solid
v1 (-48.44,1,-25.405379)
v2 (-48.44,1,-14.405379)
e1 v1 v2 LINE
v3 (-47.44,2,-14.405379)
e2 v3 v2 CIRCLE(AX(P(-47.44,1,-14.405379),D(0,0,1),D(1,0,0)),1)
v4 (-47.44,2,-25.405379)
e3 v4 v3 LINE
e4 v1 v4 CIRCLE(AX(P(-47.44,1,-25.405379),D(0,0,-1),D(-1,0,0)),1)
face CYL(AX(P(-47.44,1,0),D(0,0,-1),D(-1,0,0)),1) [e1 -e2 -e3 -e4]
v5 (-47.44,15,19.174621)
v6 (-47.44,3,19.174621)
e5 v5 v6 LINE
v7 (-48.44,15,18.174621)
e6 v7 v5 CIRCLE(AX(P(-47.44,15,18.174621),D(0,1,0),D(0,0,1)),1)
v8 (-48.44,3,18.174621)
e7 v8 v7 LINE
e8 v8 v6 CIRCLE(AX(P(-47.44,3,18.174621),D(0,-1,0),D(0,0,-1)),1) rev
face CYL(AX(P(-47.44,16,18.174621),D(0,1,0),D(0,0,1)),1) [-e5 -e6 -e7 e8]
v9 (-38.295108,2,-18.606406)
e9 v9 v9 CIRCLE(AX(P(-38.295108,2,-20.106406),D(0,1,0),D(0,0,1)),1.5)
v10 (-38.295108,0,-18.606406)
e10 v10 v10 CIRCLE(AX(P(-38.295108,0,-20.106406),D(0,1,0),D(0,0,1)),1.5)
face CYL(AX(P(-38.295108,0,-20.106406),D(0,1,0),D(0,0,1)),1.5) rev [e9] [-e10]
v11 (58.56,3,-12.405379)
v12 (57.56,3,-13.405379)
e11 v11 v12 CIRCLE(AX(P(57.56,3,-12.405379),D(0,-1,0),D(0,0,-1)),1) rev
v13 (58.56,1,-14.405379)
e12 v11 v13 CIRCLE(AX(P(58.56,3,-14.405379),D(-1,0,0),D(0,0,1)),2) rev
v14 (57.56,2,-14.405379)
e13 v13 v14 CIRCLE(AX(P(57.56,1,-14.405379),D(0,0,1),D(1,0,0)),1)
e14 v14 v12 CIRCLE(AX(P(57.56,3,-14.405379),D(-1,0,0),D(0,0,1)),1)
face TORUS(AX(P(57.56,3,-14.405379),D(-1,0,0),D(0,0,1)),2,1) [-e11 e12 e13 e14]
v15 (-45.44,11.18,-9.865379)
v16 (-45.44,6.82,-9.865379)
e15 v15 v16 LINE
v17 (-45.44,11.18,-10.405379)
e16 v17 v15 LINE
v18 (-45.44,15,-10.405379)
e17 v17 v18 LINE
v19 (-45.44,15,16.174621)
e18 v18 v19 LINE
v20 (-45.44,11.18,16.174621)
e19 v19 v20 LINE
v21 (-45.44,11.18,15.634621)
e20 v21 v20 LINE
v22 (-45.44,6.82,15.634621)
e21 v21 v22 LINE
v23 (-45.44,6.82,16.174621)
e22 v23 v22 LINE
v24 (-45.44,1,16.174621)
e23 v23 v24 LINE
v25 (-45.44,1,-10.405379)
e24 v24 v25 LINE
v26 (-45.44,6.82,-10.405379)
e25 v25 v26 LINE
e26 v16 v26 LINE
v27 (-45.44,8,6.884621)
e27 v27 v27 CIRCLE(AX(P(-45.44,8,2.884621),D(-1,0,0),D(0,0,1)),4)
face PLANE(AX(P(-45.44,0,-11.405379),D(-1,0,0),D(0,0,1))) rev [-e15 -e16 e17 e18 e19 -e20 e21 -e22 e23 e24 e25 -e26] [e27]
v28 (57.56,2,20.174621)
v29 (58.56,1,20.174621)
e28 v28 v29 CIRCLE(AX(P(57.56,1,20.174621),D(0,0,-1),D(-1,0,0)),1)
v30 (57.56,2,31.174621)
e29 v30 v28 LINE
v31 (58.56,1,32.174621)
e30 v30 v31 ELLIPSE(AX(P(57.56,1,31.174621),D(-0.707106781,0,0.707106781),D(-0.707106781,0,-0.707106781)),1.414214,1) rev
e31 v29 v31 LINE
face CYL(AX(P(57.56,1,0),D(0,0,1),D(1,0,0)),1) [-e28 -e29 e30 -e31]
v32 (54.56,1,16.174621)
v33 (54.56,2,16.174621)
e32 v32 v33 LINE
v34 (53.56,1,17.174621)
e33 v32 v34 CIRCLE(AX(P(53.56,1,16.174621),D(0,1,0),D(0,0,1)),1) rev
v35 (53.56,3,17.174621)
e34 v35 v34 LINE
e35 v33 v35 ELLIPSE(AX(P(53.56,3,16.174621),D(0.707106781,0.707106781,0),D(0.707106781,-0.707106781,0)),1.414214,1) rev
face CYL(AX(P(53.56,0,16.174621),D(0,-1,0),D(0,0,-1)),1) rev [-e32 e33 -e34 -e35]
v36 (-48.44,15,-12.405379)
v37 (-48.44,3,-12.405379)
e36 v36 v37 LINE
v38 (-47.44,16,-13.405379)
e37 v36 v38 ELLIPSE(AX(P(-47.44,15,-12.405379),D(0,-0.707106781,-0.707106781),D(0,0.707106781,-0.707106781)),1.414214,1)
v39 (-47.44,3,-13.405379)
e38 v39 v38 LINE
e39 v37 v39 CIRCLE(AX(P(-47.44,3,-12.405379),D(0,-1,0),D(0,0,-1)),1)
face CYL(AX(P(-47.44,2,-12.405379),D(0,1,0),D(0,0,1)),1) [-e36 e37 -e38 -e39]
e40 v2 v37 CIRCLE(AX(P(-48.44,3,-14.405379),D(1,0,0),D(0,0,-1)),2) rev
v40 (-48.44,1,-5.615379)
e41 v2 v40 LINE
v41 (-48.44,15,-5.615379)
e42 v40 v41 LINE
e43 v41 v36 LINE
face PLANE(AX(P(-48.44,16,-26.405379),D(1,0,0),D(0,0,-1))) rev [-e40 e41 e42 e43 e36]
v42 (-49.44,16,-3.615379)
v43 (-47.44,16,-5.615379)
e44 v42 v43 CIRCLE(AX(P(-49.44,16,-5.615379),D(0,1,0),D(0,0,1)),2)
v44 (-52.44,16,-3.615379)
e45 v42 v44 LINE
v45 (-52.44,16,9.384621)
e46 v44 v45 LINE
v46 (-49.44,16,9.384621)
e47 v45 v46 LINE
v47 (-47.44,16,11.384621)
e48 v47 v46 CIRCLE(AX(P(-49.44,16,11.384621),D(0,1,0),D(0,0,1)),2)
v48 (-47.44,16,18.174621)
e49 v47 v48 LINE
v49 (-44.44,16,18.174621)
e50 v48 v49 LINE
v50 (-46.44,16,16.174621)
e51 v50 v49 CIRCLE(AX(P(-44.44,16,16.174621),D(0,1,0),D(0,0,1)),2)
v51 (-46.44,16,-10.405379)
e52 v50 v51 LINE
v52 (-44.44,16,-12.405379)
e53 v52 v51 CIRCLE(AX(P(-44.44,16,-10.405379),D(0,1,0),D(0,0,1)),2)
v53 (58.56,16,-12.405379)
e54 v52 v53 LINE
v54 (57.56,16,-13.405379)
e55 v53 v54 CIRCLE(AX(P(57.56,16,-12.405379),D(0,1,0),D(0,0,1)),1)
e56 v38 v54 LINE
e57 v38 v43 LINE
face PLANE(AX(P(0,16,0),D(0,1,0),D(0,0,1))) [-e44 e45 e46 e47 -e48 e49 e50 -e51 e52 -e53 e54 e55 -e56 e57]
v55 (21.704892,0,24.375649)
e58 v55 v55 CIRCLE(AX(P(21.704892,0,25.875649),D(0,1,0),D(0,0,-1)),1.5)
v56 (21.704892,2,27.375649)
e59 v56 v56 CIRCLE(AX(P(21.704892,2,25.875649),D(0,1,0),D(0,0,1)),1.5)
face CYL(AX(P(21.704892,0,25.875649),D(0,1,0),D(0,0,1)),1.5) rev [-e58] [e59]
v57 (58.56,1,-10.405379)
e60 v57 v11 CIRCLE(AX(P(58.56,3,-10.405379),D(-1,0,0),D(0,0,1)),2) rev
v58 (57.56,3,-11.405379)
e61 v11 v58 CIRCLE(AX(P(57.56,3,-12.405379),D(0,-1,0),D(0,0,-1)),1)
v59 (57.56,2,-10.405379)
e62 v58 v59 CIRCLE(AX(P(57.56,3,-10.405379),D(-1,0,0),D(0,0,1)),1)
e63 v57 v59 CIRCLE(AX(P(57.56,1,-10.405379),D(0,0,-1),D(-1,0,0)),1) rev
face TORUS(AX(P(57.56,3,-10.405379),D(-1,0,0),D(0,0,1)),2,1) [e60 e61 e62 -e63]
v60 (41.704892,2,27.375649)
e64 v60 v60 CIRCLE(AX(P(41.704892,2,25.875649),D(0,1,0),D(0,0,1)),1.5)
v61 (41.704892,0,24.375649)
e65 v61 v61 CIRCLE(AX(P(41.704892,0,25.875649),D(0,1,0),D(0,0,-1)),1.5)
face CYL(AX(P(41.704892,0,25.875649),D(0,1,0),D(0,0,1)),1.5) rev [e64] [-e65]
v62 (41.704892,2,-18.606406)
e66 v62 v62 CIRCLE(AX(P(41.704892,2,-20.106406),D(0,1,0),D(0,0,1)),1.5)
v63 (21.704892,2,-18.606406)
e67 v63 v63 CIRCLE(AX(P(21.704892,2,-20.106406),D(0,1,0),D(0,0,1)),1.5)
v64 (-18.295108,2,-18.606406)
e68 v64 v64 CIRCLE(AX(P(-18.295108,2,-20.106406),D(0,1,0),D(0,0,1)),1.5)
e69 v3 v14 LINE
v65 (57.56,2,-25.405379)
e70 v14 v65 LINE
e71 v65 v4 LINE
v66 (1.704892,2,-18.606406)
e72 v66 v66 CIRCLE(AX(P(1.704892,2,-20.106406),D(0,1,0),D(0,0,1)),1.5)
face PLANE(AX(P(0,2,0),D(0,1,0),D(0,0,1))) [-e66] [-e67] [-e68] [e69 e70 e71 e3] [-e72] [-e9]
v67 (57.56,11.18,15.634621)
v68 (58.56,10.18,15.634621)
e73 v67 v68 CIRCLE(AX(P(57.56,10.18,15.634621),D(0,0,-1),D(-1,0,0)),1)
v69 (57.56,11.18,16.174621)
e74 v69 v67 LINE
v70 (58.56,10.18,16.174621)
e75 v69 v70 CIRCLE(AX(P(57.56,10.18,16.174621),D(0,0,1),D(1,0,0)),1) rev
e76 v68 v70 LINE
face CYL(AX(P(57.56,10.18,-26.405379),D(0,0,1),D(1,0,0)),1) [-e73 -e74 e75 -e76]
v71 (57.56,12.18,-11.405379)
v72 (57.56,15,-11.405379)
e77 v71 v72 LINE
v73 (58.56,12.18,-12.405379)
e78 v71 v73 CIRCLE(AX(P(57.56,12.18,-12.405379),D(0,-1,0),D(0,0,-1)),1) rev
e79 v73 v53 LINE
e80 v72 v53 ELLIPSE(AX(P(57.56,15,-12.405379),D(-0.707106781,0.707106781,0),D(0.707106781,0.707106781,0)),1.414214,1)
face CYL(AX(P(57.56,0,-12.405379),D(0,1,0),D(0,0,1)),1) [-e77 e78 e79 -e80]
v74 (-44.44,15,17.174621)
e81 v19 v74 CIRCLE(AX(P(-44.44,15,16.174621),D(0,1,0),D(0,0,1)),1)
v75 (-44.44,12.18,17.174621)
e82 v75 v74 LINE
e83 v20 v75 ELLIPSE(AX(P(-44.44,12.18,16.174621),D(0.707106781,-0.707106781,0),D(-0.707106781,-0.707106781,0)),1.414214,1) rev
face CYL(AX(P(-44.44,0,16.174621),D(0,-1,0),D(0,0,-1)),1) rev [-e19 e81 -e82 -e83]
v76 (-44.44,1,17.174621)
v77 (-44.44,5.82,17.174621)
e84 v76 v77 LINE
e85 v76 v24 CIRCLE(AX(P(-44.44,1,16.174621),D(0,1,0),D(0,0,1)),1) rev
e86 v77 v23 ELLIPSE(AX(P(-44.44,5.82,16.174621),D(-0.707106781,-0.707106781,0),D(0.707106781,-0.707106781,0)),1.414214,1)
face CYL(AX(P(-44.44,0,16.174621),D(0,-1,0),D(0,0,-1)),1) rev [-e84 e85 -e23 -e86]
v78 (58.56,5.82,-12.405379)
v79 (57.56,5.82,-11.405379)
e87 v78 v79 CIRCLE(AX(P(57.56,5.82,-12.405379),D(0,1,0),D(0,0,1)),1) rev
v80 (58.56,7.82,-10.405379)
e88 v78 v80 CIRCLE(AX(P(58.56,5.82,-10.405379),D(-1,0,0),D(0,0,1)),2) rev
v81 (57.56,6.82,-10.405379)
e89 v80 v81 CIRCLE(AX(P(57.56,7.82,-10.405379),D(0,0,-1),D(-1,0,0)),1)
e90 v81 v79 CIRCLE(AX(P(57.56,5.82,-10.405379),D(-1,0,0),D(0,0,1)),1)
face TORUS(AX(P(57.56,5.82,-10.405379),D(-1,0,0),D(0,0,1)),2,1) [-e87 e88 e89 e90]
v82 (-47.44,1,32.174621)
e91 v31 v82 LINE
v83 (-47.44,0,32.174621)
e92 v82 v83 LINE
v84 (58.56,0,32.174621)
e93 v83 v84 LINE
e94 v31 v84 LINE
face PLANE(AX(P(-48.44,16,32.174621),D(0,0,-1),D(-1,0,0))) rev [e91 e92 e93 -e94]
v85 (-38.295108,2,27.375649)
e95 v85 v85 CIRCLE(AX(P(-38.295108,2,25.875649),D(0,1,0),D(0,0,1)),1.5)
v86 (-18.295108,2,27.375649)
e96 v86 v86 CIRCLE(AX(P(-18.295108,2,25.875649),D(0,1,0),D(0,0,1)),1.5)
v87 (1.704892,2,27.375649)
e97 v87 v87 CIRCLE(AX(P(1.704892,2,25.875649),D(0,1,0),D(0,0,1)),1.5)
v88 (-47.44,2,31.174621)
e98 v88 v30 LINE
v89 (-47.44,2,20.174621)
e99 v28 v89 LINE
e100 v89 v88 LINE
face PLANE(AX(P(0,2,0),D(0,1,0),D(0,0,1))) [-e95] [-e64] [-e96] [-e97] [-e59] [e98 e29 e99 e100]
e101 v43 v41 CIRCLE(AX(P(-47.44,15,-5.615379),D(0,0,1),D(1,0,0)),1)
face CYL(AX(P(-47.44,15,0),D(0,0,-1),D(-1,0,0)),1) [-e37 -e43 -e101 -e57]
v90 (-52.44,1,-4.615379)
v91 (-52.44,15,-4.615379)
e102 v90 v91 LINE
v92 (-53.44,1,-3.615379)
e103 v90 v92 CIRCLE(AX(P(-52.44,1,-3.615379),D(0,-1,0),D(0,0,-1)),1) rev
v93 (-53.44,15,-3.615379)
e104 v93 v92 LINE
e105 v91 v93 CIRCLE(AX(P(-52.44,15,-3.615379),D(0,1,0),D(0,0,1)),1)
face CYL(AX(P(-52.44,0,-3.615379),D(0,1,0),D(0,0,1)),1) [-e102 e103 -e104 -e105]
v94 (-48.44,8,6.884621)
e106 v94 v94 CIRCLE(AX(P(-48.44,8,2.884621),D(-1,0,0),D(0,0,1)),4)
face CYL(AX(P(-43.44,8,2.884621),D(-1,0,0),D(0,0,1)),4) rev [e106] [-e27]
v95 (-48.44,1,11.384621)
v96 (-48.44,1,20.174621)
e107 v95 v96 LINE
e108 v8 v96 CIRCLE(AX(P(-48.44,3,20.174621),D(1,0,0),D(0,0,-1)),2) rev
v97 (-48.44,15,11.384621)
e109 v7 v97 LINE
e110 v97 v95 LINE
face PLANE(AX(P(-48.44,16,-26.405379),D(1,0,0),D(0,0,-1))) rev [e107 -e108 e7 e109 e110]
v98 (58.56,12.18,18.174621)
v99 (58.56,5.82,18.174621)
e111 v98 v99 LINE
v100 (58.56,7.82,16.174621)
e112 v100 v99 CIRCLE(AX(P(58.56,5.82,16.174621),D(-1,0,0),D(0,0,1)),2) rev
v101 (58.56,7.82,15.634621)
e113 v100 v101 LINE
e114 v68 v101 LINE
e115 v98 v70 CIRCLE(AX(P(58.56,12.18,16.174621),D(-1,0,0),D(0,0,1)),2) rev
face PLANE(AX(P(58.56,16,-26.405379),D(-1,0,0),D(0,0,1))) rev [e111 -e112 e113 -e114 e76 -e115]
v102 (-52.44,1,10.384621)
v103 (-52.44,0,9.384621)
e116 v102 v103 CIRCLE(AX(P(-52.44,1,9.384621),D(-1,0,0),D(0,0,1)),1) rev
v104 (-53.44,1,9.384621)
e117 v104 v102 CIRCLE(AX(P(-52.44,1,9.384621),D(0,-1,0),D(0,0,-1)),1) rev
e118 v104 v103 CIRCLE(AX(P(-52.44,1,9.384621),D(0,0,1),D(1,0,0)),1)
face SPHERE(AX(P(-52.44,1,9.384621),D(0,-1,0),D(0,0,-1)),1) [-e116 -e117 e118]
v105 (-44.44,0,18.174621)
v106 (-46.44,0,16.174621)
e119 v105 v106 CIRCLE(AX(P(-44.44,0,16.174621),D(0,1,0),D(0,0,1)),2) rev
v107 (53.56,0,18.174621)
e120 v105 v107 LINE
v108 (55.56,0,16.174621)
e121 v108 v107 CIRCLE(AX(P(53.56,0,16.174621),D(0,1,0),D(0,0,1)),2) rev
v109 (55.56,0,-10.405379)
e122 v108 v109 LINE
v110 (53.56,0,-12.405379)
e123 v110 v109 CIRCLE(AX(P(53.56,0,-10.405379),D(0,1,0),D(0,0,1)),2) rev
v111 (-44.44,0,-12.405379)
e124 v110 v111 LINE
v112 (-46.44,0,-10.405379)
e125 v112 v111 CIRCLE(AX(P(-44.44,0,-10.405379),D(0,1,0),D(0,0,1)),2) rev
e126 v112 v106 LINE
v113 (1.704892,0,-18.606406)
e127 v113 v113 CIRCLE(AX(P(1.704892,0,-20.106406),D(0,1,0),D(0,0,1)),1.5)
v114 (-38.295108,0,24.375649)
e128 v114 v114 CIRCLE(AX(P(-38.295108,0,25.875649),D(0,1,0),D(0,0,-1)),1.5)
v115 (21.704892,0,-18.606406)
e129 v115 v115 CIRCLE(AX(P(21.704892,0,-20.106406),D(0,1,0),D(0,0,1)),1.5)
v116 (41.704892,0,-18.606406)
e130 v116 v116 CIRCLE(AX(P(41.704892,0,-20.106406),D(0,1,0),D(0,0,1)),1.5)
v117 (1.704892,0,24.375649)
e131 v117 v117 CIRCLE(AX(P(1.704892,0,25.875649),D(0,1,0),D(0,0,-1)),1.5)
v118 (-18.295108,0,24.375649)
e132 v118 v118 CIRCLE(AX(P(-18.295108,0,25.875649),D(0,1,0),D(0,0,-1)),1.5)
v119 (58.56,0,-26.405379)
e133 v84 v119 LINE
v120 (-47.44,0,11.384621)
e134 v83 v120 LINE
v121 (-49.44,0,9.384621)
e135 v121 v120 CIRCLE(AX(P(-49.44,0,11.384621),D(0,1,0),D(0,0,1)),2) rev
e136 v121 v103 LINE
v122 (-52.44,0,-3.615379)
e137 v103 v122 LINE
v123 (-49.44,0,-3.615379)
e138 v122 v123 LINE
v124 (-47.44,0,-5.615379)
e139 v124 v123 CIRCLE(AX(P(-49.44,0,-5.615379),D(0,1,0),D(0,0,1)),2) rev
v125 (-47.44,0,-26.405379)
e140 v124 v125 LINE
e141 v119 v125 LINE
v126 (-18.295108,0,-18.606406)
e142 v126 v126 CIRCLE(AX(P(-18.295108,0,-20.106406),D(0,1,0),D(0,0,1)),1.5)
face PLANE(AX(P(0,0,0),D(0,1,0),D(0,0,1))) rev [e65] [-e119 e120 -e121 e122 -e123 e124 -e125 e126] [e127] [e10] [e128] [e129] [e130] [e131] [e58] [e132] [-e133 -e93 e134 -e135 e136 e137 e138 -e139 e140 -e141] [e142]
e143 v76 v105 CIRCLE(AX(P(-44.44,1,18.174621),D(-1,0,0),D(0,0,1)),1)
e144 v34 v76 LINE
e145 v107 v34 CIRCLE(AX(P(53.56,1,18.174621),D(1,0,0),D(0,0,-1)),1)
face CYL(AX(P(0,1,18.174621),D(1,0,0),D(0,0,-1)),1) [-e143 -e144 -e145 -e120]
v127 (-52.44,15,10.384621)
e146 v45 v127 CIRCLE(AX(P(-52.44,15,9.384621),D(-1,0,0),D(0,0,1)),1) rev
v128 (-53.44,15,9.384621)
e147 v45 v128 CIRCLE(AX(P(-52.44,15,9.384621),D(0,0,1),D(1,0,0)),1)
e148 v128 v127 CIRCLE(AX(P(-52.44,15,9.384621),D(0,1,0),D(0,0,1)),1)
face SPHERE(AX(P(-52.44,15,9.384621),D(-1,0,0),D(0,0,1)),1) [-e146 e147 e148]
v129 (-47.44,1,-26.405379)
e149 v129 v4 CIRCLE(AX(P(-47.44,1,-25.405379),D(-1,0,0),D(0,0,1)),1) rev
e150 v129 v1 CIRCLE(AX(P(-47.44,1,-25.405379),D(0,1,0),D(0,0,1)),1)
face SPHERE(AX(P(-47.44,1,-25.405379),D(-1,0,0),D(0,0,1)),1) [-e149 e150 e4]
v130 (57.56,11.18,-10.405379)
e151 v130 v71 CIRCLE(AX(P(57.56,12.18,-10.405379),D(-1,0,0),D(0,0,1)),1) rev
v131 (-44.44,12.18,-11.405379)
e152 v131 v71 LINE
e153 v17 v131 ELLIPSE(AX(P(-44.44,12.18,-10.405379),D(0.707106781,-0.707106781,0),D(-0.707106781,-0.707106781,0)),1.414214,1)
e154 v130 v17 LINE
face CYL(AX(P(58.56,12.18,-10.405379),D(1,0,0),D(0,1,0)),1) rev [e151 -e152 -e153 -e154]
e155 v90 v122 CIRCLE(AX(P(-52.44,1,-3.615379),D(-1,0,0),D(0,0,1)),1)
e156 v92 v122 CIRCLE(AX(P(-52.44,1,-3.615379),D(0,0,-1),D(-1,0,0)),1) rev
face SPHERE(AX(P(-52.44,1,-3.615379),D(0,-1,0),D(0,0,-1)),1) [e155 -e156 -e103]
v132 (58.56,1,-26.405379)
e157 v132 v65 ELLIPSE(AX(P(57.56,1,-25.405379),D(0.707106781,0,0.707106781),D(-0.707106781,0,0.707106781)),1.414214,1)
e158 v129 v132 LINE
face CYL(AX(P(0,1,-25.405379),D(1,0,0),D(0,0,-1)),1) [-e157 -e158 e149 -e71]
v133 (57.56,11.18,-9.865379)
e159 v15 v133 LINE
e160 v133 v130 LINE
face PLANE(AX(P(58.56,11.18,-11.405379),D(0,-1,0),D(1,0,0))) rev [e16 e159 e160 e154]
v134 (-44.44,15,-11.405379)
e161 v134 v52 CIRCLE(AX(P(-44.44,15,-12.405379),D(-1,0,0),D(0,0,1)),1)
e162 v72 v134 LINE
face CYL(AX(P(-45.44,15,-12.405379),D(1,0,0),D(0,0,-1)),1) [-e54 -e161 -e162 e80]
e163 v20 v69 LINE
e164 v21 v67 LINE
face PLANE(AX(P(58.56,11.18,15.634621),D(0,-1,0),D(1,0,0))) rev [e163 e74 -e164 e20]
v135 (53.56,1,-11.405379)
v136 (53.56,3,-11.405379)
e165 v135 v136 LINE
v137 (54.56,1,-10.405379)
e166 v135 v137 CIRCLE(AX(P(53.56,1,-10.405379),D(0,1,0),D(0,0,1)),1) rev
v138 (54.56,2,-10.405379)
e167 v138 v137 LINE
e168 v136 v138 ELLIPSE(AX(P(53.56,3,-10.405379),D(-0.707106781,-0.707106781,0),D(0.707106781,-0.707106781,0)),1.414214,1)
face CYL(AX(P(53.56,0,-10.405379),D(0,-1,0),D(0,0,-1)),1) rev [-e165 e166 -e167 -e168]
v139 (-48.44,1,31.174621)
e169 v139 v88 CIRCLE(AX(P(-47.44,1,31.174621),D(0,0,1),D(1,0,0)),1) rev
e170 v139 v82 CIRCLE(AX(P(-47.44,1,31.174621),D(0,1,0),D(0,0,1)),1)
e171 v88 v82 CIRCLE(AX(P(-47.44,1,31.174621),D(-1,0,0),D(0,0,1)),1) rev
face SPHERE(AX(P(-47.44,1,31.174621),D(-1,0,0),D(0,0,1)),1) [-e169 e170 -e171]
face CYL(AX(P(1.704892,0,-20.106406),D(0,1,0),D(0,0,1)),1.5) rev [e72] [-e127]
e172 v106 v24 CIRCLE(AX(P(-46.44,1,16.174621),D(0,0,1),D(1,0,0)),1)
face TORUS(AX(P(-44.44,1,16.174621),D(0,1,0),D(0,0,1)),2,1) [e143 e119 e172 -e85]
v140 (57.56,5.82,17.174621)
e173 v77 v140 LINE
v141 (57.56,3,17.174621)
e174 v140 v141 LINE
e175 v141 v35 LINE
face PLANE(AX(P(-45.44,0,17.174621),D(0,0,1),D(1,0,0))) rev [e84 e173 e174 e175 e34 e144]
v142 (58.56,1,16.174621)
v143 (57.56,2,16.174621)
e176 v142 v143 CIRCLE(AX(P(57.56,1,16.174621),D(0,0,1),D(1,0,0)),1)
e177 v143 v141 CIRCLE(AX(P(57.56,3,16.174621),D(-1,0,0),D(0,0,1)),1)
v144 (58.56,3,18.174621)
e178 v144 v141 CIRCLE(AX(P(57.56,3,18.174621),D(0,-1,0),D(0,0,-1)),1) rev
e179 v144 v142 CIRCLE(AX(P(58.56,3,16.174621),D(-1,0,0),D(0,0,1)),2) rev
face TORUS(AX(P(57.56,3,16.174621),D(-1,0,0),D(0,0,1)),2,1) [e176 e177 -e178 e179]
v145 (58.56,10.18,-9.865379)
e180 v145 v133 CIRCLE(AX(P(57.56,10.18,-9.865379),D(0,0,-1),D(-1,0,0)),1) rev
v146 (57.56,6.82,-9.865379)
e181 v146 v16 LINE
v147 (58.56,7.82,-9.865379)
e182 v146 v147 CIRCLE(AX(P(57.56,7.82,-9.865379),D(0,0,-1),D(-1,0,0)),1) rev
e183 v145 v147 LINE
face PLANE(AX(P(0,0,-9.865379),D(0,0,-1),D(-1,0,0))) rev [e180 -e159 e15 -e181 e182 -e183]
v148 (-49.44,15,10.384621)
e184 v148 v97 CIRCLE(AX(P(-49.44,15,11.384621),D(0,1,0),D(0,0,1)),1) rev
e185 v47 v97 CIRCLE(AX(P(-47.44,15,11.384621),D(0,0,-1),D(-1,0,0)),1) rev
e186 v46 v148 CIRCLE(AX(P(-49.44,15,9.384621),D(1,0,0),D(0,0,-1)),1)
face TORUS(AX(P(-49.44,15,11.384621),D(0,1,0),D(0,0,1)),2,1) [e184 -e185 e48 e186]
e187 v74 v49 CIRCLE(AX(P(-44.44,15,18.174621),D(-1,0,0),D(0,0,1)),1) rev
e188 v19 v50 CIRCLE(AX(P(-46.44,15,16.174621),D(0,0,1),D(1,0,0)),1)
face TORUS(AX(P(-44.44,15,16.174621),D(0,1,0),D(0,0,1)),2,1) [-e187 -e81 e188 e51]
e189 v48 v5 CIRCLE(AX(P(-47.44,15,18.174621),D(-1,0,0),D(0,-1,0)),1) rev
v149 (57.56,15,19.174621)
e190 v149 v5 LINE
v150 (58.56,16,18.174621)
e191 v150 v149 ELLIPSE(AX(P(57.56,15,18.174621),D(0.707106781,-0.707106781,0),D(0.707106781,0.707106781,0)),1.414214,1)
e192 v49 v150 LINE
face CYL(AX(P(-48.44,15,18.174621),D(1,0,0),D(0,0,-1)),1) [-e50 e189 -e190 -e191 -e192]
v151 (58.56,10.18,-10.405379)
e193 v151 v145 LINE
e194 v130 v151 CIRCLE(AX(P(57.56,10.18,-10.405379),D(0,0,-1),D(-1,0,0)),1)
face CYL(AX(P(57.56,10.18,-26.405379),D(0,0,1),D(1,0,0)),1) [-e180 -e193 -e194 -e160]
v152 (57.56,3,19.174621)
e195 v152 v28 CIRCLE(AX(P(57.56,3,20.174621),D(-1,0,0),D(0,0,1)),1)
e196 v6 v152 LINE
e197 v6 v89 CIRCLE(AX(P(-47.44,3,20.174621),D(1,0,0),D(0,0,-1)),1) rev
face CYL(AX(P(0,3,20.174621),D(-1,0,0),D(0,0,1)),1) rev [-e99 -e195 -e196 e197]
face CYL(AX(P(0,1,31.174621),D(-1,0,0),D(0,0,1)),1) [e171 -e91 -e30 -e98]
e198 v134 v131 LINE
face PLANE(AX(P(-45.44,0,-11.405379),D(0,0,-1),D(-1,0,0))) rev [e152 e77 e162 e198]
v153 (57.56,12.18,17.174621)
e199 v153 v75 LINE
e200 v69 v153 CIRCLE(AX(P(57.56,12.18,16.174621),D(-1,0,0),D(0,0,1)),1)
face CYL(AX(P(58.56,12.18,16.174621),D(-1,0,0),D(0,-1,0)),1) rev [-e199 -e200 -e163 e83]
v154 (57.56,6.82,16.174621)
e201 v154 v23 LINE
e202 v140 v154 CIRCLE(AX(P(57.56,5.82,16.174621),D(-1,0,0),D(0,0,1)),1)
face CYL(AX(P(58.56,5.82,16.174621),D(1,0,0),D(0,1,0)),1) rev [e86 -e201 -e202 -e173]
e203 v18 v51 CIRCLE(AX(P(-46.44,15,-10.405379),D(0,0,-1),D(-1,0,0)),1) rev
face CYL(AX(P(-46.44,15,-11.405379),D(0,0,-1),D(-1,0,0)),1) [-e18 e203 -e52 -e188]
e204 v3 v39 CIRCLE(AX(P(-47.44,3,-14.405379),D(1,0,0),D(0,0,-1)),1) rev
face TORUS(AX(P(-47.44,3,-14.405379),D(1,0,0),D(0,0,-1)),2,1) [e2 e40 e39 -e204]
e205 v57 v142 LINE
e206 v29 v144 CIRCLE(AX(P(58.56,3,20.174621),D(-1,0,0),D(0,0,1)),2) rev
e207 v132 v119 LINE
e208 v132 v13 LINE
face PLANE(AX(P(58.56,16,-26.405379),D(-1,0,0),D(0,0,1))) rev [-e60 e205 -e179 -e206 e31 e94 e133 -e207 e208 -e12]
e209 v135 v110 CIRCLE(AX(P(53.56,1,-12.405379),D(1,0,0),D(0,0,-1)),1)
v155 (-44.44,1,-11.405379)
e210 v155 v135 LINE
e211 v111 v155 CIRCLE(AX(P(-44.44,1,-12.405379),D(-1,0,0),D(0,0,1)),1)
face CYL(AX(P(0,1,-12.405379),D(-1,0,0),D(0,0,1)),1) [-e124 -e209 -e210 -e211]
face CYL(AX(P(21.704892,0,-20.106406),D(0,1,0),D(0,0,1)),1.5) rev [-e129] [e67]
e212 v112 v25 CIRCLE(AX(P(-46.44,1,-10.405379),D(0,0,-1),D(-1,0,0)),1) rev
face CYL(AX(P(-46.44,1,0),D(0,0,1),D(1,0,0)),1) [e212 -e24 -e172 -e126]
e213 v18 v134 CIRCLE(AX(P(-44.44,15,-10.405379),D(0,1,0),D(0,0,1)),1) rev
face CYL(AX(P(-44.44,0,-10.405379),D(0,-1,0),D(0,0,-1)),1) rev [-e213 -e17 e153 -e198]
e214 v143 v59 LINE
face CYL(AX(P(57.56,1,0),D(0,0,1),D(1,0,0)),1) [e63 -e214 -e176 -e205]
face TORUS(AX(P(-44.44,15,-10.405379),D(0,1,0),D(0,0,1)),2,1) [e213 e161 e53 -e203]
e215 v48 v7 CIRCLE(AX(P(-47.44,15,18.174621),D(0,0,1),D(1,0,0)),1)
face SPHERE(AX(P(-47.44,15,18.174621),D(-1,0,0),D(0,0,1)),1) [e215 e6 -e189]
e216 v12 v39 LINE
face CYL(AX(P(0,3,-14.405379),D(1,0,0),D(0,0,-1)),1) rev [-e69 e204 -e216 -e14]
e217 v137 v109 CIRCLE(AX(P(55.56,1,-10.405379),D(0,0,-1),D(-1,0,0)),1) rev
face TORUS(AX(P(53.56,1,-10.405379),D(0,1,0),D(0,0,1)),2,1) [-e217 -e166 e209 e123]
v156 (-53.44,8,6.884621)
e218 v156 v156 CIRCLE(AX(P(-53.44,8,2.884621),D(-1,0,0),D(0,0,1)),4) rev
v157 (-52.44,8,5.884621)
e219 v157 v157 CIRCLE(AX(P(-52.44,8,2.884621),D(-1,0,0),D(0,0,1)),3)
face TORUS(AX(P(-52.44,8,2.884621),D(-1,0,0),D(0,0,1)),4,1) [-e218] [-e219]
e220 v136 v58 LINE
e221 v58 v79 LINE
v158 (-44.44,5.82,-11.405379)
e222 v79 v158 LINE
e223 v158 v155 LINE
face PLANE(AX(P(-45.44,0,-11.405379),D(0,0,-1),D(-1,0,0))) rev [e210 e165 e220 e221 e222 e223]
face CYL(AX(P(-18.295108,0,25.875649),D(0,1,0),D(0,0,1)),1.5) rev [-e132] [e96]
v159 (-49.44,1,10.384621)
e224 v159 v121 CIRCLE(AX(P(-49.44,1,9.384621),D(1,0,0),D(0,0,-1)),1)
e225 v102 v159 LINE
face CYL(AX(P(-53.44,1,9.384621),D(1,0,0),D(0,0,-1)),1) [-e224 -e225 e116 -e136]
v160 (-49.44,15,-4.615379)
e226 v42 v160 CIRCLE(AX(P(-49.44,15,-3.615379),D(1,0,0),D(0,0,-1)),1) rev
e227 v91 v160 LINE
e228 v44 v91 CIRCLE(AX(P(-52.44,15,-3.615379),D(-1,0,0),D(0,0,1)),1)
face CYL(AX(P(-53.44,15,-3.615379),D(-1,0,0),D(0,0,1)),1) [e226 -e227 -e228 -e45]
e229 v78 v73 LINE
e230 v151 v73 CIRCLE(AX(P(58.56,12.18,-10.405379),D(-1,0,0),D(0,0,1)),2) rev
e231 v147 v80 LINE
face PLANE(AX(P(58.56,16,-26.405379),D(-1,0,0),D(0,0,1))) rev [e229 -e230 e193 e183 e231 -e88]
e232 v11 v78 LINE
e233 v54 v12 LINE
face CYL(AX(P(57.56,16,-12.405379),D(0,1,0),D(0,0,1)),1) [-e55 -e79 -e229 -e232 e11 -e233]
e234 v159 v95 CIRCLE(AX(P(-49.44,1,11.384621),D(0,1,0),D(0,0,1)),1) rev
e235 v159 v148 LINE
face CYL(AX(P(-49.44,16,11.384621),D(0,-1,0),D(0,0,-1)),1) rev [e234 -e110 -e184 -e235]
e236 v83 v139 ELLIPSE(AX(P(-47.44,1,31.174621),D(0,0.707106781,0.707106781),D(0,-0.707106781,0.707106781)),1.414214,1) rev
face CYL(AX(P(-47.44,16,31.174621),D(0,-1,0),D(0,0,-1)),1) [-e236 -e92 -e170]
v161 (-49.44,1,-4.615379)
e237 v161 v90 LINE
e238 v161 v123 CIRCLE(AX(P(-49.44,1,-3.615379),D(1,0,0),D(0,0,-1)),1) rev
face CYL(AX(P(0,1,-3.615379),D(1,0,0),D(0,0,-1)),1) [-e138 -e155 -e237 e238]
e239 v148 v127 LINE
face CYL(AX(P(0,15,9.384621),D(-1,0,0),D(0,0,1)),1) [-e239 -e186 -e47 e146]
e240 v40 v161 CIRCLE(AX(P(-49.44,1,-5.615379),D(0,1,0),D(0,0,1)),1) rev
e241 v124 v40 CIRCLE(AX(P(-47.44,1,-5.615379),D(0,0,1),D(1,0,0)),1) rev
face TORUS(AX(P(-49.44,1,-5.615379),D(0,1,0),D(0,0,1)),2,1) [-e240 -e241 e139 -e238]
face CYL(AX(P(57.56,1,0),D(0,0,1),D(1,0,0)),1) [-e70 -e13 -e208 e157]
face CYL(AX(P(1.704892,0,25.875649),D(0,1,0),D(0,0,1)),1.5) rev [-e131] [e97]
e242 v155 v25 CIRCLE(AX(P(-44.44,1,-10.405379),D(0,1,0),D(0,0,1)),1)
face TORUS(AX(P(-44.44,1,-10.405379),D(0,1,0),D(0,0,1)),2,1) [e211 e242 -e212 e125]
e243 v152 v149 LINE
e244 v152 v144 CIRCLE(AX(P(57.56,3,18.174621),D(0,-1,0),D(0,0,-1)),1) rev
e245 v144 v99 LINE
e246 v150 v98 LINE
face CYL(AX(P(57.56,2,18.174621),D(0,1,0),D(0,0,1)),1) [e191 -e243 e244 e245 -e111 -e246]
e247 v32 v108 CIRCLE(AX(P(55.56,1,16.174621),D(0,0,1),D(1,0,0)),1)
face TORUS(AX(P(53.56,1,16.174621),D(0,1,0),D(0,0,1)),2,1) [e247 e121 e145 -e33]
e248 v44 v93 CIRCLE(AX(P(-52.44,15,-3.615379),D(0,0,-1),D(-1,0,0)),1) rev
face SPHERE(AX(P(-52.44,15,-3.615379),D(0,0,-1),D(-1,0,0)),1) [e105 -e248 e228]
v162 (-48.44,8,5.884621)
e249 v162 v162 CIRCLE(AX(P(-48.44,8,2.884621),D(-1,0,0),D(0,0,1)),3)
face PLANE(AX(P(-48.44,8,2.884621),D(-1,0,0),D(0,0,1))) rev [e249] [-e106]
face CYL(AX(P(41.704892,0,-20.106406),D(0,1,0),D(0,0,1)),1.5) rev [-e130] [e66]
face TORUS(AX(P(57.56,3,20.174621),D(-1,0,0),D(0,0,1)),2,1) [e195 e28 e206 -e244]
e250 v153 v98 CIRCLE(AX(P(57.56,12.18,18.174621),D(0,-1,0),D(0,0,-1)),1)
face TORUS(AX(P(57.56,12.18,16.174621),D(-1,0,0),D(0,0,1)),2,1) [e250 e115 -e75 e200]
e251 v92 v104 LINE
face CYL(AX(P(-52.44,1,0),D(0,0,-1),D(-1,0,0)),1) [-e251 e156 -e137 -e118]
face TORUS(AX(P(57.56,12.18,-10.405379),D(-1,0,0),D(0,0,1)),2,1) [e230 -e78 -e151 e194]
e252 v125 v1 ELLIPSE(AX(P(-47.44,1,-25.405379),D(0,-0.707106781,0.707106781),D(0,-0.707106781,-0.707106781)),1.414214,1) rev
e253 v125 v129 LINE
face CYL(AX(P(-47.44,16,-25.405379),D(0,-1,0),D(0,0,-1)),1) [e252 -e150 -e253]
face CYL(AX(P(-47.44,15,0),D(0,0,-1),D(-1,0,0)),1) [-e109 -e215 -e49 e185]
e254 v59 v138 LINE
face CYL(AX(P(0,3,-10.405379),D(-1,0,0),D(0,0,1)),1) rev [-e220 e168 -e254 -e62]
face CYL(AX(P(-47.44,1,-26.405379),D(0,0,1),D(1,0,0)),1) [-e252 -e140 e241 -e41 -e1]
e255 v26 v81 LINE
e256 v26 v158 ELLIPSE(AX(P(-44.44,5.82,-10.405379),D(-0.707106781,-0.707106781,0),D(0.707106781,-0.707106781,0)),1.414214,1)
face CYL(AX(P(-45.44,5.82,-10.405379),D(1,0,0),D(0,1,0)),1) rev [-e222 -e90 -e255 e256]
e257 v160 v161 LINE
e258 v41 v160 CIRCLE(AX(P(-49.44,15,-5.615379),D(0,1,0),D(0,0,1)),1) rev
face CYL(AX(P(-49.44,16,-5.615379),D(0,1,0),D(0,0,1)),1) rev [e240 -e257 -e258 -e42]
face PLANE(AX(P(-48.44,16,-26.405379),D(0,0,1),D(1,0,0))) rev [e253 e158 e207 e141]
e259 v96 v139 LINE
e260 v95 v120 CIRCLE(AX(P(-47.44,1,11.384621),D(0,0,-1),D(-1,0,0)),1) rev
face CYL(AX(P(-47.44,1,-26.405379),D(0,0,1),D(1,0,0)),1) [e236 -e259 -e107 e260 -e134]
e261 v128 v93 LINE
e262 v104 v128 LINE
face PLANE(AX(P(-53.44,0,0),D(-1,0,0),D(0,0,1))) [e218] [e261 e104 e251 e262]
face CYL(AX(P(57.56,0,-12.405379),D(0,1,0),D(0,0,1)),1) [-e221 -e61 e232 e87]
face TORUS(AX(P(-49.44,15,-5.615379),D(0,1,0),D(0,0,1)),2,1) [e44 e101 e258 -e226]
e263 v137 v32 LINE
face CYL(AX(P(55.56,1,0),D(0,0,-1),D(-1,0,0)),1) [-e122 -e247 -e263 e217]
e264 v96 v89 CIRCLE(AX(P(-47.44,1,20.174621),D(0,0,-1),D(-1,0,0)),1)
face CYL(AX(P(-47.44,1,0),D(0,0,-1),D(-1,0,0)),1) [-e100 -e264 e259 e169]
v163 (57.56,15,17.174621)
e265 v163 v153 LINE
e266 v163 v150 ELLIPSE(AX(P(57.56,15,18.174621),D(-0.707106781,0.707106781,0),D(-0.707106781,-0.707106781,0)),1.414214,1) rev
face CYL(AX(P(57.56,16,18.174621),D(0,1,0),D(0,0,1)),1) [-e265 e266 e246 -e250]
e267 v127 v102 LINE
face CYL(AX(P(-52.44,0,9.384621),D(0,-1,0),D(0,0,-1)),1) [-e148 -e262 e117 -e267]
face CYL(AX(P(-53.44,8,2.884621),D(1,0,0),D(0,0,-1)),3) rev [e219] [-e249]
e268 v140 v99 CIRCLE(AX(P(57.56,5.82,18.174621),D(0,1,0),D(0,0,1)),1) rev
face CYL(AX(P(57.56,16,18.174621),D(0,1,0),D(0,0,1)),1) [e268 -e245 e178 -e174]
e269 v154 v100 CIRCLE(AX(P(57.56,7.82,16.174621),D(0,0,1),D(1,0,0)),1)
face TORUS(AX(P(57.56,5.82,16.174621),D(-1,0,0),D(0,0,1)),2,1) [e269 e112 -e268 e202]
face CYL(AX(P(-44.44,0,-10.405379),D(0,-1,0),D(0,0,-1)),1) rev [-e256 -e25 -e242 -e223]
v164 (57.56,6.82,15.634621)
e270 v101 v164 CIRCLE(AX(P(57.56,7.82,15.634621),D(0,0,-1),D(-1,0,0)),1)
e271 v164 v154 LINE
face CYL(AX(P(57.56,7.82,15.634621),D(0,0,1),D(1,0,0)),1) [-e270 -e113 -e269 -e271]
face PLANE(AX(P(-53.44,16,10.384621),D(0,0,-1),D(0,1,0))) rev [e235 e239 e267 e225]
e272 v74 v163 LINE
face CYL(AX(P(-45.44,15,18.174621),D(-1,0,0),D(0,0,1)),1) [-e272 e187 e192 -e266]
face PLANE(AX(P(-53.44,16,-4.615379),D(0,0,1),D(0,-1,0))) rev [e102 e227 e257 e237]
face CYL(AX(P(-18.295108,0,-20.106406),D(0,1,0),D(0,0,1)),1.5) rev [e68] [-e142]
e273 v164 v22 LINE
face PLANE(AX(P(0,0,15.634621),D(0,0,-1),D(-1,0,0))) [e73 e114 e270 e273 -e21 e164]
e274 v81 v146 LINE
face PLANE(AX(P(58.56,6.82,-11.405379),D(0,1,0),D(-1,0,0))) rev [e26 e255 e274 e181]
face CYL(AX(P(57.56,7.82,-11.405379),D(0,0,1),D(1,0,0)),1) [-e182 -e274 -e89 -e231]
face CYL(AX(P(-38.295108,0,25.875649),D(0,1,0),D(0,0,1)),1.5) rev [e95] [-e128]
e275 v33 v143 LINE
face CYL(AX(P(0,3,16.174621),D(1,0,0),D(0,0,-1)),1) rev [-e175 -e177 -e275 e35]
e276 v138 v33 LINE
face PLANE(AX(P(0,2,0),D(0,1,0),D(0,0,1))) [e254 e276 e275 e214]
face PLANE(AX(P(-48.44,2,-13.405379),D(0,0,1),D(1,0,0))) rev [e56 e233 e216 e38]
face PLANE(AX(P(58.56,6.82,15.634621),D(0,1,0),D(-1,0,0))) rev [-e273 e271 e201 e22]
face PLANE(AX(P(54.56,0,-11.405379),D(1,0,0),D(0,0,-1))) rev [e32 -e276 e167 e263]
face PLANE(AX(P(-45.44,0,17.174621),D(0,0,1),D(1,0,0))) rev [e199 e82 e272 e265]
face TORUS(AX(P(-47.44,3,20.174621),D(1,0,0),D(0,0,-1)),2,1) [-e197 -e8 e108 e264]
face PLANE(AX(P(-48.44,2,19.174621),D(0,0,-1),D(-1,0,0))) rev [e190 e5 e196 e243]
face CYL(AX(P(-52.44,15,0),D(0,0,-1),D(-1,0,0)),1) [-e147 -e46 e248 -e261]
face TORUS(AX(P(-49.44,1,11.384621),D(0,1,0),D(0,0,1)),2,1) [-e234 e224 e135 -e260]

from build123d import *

# Parameters (mm, degrees)
SKETCH1_W               = 107
SKETCH1_H               = 58.58
BOSS_EXTRUDE1_DEPTH     = 16
SKETCH2_W               = 100
SKETCH2_H               = 28.58
CUT_EXTRUDE1_DEPTH      = 16
SKETCH3_W               = 107
SKETCH3_H               = 13
SKETCH3_W_2             = 4
SKETCH3_H_2             = 28.58
CUT_EXTRUDE2_DEPTH      = 14
SKETCH4_W               = 15
SKETCH4_H               = 16
SKETCH4_R               = 3
BOSS_EXTRUDE2_DEPTH     = 5
SKETCH6_W               = 107
SKETCH6_H               = 4.36
BOSS_EXTRUDE3_DEPTH     = 1.54
LPATTERN1_COUNT         = 2
LPATTERN1_PITCH         = 27.04
FILLET1_R               = 1
SKETCH8_R               = 4
CUT_EXTRUDE3_DEPTH      = 5
CUT_EXTRUDE4_DEPTH      = 69.267707228
CUT_EXTRUDE4_DEPTH_BACK = 69.267707228
SKETCH9_R               = 1.5


with BuildPart() as part:
    # Sketch1 → Boss-Extrude1 (new body)
    with BuildSketch(Plane(origin=(0, 0, 0), x_dir=(1, 0, 0), z_dir=(0, 1, 0))):
        with Locations((5.06, -2.884621212)):
            Rectangle(SKETCH1_W, SKETCH1_H)
    extrude(amount=BOSS_EXTRUDE1_DEPTH)

    # Sketch2 → Cut-Extrude1 (cut)
    with BuildSketch(Plane(origin=(0, 16, 0), x_dir=(1, 0, 0), z_dir=(0, 1, 0))):
        with Locations((4.56, -2.884621212)):
            Rectangle(SKETCH2_W, SKETCH2_H)
    extrude(amount=-CUT_EXTRUDE1_DEPTH, mode=Mode.SUBTRACT)

    # Sketch3 → Cut-Extrude2 (cut)
    with BuildSketch(Plane(origin=(0, 16, 0), x_dir=(1, 0, 0), z_dir=(0, 1, 0))):
        with Locations((5.06, 19.905378788)):
            Rectangle(SKETCH3_W, SKETCH3_H)
        with Locations((5.06, -25.674621212)):
            Rectangle(SKETCH3_W, SKETCH3_H)
        with Locations((56.56, -2.884621212)):
            Rectangle(SKETCH3_W_2, SKETCH3_H_2)
    extrude(amount=-CUT_EXTRUDE2_DEPTH, mode=Mode.SUBTRACT)

    # Sketch4 → Boss-Extrude2 (add)
    with BuildSketch(Plane.ZY.offset(48.44)):
        with Locations((2.884621212, 8)):
            Rectangle(SKETCH4_W, SKETCH4_H)
        with Locations((2.884621212, 8)):
            Circle(SKETCH4_R, mode=Mode.SUBTRACT)
    extrude(amount=BOSS_EXTRUDE2_DEPTH)

    # Sketch6 → Boss-Extrude3 (add)
    with BuildSketch(Plane(origin=(0, 0, 17.174621212), x_dir=(-1, 0, 0), z_dir=(0, 0, -1))):
        with Locations((-5.06, 9)):
            Rectangle(SKETCH6_W, SKETCH6_H)
    boss_extrude3 = extrude(amount=BOSS_EXTRUDE3_DEPTH)

    # LPattern1: Boss-Extrude3 ×2
    with Locations(*[(0, 0, -i * LPATTERN1_PITCH) for i in range(1, LPATTERN1_COUNT)]):
        add(boss_extrude3)

    # Fillet1
    fillet1_edges = [part.edges().sort_by_distance(p)[0] for p in [
        (58.56, 6.82, -10.635378788),
        (-45.44, 16, 2.884621212),
        (58.56, 11.18, -10.635378788),
        (-45.44, 0, 2.884621212),
        (54.56, 0, 2.884621212),
        (58.56, 2, 2.884621212),
        (58.56, 6.82, 16.404621212),
        (58.56, 4.41, -11.405378788),
        (56.56, 2, -11.405378788),
        (54.56, 1, -11.405378788),
        (4.56, 0, -11.405378788),
        (-45.44, 3.41, -11.405378788),
        (6.56, 6.82, -11.405378788),
        (-45.44, 13.59, -11.405378788),
        (6.56, 16, -11.405378788),
        (58.56, 13.59, -11.405378788),
        (6.56, 11.18, -11.405378788),
        (-45.44, 3.41, 17.174621212),
        (4.56, 0, 17.174621212),
        (54.56, 1, 17.174621212),
        (56.56, 2, 17.174621212),
        (58.56, 4.41, 17.174621212),
        (6.56, 6.82, 17.174621212),
        (5.06, 2, 19.174621212),
        (58.56, 11.18, 16.404621212),
        (-50.94, 16, 10.384621212),
        (-50.94, 0, 10.384621212),
        (-50.94, 0, -4.615378788),
        (-50.94, 16, -4.615378788),
        (58.56, 9, -13.405378788),
        (58.56, 9, 19.174621212),
        (5.06, 16, 19.174621212),
        (58.56, 2, 25.674621212),
        (5.06, 2, 32.174621212),
        (58.56, 13.59, 17.174621212),
        (6.56, 16, 17.174621212),
        (-45.44, 13.59, 17.174621212),
        (6.56, 11.18, 17.174621212),
        (-48.44, 16, 14.779621212),
        (-48.44, 9, 19.174621212),
        (-48.44, 2, 25.674621212),
        (-48.44, 1, 32.174621212),
        (-48.44, 0, 21.279621212),
        (-48.44, 8, 10.384621212),
        (-53.44, 8, -0.115378788),
        (-53.44, 16, 2.884621212),
        (-53.44, 8, 10.384621212),
        (-53.44, 0, 2.884621212),
        (-53.44, 8, -4.615378788),
        (-48.44, 0, -15.510378788),
        (-48.44, 1, -26.405378788),
        (-48.44, 9, -13.405378788),
        (-48.44, 16, -9.010378788),
        (-48.44, 8, -4.615378788),
        (5.06, 2, -26.405378788),
        (58.56, 2, -19.905378788),
        (5.06, 2, -13.405378788),
        (-48.44, 2, -19.905378788),
    ]]
    fillet(fillet1_edges, radius=FILLET1_R - 0.0001)  # a hair under: the kernel refuses the full size

    # Sketch8 → Cut-Extrude3 (cut)
    with BuildSketch(Plane.ZY.offset(48.44)):
        with Locations((2.884621212, 8)):
            Circle(SKETCH8_R)
    extrude(amount=-CUT_EXTRUDE3_DEPTH, mode=Mode.SUBTRACT)

    # Sketch9 → Cut-Extrude4 (cut, two sides: drawn at the far end of the back side and taken through both)
    with BuildSketch(Plane(origin=(0, 2, 0), x_dir=(1, 0, 0), z_dir=(0, 1, 0)).offset(-CUT_EXTRUDE4_DEPTH_BACK)):
        with Locations(Location((-38.295107849, 20.106406235, 0), (0, 0, 270))):
            Circle(SKETCH9_R)
        with Locations(Location((-18.295107849, 20.106406235, 0), (0, 0, 270))):
            Circle(SKETCH9_R)
        with Locations(Location((1.704892151, 20.106406235, 0), (0, 0, 270))):
            Circle(SKETCH9_R)
        with Locations(Location((21.704892151, 20.106406235, 0), (0, 0, 270))):
            Circle(SKETCH9_R)
        with Locations(Location((41.704892151, 20.106406235, 0), (0, 0, 270))):
            Circle(SKETCH9_R)
        with Locations(Location((41.704892151, -25.87564866, 0), (0, 0, 270))):
            Circle(SKETCH9_R)
        with Locations(Location((21.704892151, -25.87564866, 0), (0, 0, 270))):
            Circle(SKETCH9_R)
        with Locations(Location((1.704892151, -25.87564866, 0), (0, 0, 270))):
            Circle(SKETCH9_R)
        with Locations(Location((-18.295107849, -25.87564866, 0), (0, 0, 270))):
            Circle(SKETCH9_R)
        with Locations(Location((-38.295107849, -25.87564866, 0), (0, 0, 270))):
            Circle(SKETCH9_R)
    extrude(amount=CUT_EXTRUDE4_DEPTH + CUT_EXTRUDE4_DEPTH_BACK, mode=Mode.SUBTRACT)


solid = part.part
